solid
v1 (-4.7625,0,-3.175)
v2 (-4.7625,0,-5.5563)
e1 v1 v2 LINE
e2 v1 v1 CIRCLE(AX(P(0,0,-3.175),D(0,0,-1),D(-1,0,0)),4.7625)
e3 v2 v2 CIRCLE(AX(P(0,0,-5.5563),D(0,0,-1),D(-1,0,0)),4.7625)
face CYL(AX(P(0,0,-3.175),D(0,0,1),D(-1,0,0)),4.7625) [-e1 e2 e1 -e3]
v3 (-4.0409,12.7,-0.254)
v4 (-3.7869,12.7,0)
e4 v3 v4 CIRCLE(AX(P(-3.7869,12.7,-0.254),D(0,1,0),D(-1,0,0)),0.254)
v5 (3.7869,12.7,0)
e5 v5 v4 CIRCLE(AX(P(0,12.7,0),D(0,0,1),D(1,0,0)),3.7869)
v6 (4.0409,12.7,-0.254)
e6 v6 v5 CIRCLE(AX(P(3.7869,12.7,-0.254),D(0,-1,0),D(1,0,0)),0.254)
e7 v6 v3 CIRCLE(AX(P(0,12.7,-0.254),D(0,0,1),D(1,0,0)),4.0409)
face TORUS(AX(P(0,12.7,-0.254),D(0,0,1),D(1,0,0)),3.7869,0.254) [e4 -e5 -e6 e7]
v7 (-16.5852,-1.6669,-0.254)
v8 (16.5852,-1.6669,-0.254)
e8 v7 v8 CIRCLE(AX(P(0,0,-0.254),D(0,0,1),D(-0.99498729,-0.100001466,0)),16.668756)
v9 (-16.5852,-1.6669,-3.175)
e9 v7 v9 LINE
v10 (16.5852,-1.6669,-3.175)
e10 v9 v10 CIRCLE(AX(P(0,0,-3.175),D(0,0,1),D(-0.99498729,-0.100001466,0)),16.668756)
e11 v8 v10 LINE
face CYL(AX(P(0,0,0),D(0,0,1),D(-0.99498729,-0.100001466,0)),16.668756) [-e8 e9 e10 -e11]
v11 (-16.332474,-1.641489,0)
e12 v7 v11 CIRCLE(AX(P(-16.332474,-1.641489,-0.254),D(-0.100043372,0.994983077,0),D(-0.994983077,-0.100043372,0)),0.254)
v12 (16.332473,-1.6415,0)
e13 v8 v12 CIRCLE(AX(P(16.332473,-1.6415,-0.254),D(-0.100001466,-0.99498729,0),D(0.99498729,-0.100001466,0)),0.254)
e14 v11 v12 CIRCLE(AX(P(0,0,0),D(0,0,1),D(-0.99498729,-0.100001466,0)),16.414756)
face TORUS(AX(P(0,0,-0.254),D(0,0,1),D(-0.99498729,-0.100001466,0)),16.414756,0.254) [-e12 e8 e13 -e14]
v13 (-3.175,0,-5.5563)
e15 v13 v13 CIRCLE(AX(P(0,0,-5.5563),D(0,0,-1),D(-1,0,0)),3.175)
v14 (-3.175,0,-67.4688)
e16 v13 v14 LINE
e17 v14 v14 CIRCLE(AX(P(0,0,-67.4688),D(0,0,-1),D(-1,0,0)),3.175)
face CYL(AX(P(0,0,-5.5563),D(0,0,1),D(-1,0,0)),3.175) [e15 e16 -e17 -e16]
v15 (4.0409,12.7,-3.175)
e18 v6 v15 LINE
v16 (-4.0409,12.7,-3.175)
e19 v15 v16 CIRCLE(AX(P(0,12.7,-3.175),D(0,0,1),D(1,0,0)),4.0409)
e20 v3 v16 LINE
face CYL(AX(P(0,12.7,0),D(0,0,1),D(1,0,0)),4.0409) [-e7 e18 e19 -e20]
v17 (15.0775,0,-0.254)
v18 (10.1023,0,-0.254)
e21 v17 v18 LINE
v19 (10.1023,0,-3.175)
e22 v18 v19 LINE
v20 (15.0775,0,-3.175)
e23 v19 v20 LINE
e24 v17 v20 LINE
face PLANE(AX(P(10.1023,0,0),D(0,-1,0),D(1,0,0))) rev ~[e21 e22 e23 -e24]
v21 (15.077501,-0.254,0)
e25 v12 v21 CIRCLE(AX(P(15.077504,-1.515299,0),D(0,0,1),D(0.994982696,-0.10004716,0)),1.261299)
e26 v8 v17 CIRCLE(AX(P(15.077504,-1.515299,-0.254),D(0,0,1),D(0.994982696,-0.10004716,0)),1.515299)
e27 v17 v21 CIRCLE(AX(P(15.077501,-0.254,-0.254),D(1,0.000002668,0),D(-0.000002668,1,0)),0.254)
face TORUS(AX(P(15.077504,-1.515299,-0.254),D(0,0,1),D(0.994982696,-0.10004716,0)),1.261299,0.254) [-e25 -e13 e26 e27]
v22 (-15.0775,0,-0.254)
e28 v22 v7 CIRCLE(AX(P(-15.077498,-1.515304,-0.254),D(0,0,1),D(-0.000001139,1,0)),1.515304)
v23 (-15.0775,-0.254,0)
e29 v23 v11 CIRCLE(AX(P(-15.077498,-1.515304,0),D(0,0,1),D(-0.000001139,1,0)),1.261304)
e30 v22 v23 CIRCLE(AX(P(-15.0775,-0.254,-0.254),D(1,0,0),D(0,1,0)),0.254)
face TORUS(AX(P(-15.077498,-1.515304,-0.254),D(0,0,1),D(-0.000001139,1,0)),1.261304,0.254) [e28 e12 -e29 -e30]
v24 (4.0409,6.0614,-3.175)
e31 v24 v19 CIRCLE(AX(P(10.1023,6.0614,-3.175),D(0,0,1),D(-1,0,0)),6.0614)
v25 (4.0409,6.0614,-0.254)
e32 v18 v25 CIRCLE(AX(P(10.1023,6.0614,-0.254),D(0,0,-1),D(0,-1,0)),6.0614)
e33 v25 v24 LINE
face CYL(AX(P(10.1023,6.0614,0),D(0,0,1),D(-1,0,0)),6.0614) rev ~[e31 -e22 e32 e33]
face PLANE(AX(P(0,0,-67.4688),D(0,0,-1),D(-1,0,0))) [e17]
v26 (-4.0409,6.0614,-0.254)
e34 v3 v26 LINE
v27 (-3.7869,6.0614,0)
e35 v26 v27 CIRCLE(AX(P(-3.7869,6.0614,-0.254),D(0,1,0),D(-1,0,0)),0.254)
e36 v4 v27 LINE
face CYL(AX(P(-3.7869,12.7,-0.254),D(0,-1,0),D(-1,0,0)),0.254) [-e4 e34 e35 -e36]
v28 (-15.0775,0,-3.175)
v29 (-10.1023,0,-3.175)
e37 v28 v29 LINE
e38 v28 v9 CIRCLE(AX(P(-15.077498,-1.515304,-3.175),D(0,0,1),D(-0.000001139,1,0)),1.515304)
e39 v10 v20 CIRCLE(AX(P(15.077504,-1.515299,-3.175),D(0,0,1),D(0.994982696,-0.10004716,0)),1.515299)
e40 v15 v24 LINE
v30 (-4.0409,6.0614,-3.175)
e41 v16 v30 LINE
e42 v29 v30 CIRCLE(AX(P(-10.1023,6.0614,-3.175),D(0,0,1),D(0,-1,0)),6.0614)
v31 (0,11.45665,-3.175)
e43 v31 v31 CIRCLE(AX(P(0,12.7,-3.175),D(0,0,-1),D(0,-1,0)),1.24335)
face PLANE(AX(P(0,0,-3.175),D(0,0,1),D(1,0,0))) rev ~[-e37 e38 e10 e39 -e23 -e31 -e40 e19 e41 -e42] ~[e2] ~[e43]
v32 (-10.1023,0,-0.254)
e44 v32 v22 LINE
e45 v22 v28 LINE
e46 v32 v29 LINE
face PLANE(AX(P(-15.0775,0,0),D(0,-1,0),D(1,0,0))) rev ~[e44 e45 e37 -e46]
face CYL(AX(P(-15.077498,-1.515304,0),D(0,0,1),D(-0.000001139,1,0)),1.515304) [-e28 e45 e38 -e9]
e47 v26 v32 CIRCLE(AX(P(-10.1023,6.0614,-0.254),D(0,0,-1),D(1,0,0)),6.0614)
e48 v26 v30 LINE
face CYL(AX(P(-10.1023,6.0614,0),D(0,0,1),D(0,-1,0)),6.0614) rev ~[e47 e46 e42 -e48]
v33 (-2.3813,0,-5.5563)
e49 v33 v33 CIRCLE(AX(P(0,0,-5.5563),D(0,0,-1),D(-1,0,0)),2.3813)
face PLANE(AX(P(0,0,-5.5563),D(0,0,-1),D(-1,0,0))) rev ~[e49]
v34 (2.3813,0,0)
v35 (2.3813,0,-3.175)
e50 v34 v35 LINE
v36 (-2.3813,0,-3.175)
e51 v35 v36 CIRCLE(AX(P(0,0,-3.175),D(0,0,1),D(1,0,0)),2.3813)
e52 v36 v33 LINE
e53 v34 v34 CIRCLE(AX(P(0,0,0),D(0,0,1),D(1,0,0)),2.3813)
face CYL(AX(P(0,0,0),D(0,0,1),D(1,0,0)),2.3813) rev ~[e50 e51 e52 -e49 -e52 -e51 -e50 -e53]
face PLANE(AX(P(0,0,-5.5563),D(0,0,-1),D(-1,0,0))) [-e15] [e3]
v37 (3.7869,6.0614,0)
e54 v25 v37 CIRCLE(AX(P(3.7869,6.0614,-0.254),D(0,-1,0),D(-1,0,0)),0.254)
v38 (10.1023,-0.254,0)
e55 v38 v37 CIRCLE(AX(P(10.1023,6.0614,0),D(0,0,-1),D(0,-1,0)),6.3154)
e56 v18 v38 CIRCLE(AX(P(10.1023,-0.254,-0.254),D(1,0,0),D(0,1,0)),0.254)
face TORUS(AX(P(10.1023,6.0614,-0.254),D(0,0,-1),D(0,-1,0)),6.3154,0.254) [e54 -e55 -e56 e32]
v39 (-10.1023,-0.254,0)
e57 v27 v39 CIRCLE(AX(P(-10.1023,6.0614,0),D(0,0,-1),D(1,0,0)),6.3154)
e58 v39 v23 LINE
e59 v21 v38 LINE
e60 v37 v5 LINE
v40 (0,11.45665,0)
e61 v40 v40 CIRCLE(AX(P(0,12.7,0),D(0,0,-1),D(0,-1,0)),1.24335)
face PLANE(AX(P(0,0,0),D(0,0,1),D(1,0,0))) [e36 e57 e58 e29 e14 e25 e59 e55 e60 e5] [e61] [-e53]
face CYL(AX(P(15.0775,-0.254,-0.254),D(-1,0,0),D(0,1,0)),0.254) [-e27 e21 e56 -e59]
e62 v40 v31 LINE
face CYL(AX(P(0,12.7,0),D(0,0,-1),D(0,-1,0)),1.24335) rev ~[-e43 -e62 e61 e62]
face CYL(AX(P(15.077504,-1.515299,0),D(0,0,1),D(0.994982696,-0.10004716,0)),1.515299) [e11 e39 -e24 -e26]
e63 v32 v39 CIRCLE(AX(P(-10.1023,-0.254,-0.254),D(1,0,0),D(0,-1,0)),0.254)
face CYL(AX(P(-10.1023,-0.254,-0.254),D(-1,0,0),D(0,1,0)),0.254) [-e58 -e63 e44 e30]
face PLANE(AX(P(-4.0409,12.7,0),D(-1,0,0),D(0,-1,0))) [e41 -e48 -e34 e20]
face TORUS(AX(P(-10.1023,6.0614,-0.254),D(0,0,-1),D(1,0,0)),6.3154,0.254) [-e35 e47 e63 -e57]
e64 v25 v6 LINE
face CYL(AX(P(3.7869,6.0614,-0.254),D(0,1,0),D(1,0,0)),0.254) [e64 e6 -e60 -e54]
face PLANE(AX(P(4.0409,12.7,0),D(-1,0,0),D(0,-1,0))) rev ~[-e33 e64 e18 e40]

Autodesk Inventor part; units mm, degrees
ref_plane "YZ Plane" through (0, 0, 0) normal (1, 0, 0) x (0, 1, 0)
ref_plane "XZ Plane" through (0, 0, 0) normal (0, 1, 0) x (-1, 0, 0)
ref_plane "XY Plane" through (0, 0, 0) normal (0, 0, 1) x (1, 0, 0)
sketch "Boceto1" plane through (0, 0, 0) normal (0, 0, 1) x (1, 0, 0)
  circle A0 centre (0, 0) radius 2.3813
  arc A1 (4.0409, 12.7) -> (-4.0409, 12.7) centre (0, 12.7) ccw
  arc A2 (-10.1023, 0) -> (-4.0409, 6.0614) centre (-10.1023, 6.0614) ccw
  line L0 (-4.0409, 12.7) -> (-4.0409, 6.0614)
  line L1 (4.0409, 12.7) -> (4.0409, 6.0614)
  arc A3 (4.0409, 6.0614) -> (10.1023, 0) centre (10.1023, 6.0614) ccw
  arc A4 (-15.0775, 0) -> (-16.5852, -1.6669) centre (-15.0775, -1.5153) ccw
  line L2 (-23.7372, 0) -> (23.7372, 0) construction
  arc A5 (16.5852, -1.6669) -> (15.0775, 0) centre (15.0775, -1.5153) ccw
  arc A6 (-16.5852, -1.6669) -> (16.5852, -1.6669) centre (0, 0) ccw
  line L3 (10.1023, 0) -> (15.0775, 0)
  line L4 (-15.0775, 0) -> (-10.1023, 0)
  dimension "d1" = 4.7625
  dimension "d2" = 8.0818
  dimension "d3" = 12.1227
  dimension "d5" = 12.7
  dimension "d6" = 3.0307
extrude "Extrusión1" add sketch "Boceto1" against normal blind 3.175
sketch "Boceto2" plane through (0, 0, 0) normal (0, 0, 1) x (1, 0, 0)
  line L0 (0, 0) -> (0, 12.7) construction
  line L1 (0, 0) -> (12.7, 0) construction
  dimension "d9" = 12.7
  dimension "d10" = 90
hole "Agujero1" at (0, 12.7, 0) direction (0, 0, -1) diameter 2.4867 end through all thread size "5-40 UNC" class "2B" standard "ANSI Unified Screw Threads"
sketch "Boceto3" plane through (0, 0, -3.175) normal (0, 0, -1) x (-1, 0, 0)
  circle A0 centre (0, 0) radius 4.7625
  circle A1 centre (0, 0) radius 2.3813
  dimension "d18" = 9.525
  dimension "d19" = 4.7625
extrude "Extrusión2" add sketch "Boceto3" along normal blind 2.3813
sketch "Boceto4" plane through (0, 0, -5.5563) normal (0, 0, -1) x (-1, 0, 0)
  circle A0 centre (0, 0) radius 3.175
  dimension "d22" = 6.35
extrude "Extrusión3" add sketch "Boceto4" along normal blind 61.9125
fillet "Empalme1" radius 0.254 10 edges at (-4.0409, 9.3807, 0) (-5.8162, 1.7753, 0) (-12.5899, 0, 0) (-16.2013, -0.4988, 0) (0, -16.6688, 0) (16.2013, -0.4988, 0) (12.5899, 0, 0) (5.8162, 1.7753, 0) (4.0409, 9.3807, 0) (0, 16.7409, 0)
properties part number "CrankShaft"
